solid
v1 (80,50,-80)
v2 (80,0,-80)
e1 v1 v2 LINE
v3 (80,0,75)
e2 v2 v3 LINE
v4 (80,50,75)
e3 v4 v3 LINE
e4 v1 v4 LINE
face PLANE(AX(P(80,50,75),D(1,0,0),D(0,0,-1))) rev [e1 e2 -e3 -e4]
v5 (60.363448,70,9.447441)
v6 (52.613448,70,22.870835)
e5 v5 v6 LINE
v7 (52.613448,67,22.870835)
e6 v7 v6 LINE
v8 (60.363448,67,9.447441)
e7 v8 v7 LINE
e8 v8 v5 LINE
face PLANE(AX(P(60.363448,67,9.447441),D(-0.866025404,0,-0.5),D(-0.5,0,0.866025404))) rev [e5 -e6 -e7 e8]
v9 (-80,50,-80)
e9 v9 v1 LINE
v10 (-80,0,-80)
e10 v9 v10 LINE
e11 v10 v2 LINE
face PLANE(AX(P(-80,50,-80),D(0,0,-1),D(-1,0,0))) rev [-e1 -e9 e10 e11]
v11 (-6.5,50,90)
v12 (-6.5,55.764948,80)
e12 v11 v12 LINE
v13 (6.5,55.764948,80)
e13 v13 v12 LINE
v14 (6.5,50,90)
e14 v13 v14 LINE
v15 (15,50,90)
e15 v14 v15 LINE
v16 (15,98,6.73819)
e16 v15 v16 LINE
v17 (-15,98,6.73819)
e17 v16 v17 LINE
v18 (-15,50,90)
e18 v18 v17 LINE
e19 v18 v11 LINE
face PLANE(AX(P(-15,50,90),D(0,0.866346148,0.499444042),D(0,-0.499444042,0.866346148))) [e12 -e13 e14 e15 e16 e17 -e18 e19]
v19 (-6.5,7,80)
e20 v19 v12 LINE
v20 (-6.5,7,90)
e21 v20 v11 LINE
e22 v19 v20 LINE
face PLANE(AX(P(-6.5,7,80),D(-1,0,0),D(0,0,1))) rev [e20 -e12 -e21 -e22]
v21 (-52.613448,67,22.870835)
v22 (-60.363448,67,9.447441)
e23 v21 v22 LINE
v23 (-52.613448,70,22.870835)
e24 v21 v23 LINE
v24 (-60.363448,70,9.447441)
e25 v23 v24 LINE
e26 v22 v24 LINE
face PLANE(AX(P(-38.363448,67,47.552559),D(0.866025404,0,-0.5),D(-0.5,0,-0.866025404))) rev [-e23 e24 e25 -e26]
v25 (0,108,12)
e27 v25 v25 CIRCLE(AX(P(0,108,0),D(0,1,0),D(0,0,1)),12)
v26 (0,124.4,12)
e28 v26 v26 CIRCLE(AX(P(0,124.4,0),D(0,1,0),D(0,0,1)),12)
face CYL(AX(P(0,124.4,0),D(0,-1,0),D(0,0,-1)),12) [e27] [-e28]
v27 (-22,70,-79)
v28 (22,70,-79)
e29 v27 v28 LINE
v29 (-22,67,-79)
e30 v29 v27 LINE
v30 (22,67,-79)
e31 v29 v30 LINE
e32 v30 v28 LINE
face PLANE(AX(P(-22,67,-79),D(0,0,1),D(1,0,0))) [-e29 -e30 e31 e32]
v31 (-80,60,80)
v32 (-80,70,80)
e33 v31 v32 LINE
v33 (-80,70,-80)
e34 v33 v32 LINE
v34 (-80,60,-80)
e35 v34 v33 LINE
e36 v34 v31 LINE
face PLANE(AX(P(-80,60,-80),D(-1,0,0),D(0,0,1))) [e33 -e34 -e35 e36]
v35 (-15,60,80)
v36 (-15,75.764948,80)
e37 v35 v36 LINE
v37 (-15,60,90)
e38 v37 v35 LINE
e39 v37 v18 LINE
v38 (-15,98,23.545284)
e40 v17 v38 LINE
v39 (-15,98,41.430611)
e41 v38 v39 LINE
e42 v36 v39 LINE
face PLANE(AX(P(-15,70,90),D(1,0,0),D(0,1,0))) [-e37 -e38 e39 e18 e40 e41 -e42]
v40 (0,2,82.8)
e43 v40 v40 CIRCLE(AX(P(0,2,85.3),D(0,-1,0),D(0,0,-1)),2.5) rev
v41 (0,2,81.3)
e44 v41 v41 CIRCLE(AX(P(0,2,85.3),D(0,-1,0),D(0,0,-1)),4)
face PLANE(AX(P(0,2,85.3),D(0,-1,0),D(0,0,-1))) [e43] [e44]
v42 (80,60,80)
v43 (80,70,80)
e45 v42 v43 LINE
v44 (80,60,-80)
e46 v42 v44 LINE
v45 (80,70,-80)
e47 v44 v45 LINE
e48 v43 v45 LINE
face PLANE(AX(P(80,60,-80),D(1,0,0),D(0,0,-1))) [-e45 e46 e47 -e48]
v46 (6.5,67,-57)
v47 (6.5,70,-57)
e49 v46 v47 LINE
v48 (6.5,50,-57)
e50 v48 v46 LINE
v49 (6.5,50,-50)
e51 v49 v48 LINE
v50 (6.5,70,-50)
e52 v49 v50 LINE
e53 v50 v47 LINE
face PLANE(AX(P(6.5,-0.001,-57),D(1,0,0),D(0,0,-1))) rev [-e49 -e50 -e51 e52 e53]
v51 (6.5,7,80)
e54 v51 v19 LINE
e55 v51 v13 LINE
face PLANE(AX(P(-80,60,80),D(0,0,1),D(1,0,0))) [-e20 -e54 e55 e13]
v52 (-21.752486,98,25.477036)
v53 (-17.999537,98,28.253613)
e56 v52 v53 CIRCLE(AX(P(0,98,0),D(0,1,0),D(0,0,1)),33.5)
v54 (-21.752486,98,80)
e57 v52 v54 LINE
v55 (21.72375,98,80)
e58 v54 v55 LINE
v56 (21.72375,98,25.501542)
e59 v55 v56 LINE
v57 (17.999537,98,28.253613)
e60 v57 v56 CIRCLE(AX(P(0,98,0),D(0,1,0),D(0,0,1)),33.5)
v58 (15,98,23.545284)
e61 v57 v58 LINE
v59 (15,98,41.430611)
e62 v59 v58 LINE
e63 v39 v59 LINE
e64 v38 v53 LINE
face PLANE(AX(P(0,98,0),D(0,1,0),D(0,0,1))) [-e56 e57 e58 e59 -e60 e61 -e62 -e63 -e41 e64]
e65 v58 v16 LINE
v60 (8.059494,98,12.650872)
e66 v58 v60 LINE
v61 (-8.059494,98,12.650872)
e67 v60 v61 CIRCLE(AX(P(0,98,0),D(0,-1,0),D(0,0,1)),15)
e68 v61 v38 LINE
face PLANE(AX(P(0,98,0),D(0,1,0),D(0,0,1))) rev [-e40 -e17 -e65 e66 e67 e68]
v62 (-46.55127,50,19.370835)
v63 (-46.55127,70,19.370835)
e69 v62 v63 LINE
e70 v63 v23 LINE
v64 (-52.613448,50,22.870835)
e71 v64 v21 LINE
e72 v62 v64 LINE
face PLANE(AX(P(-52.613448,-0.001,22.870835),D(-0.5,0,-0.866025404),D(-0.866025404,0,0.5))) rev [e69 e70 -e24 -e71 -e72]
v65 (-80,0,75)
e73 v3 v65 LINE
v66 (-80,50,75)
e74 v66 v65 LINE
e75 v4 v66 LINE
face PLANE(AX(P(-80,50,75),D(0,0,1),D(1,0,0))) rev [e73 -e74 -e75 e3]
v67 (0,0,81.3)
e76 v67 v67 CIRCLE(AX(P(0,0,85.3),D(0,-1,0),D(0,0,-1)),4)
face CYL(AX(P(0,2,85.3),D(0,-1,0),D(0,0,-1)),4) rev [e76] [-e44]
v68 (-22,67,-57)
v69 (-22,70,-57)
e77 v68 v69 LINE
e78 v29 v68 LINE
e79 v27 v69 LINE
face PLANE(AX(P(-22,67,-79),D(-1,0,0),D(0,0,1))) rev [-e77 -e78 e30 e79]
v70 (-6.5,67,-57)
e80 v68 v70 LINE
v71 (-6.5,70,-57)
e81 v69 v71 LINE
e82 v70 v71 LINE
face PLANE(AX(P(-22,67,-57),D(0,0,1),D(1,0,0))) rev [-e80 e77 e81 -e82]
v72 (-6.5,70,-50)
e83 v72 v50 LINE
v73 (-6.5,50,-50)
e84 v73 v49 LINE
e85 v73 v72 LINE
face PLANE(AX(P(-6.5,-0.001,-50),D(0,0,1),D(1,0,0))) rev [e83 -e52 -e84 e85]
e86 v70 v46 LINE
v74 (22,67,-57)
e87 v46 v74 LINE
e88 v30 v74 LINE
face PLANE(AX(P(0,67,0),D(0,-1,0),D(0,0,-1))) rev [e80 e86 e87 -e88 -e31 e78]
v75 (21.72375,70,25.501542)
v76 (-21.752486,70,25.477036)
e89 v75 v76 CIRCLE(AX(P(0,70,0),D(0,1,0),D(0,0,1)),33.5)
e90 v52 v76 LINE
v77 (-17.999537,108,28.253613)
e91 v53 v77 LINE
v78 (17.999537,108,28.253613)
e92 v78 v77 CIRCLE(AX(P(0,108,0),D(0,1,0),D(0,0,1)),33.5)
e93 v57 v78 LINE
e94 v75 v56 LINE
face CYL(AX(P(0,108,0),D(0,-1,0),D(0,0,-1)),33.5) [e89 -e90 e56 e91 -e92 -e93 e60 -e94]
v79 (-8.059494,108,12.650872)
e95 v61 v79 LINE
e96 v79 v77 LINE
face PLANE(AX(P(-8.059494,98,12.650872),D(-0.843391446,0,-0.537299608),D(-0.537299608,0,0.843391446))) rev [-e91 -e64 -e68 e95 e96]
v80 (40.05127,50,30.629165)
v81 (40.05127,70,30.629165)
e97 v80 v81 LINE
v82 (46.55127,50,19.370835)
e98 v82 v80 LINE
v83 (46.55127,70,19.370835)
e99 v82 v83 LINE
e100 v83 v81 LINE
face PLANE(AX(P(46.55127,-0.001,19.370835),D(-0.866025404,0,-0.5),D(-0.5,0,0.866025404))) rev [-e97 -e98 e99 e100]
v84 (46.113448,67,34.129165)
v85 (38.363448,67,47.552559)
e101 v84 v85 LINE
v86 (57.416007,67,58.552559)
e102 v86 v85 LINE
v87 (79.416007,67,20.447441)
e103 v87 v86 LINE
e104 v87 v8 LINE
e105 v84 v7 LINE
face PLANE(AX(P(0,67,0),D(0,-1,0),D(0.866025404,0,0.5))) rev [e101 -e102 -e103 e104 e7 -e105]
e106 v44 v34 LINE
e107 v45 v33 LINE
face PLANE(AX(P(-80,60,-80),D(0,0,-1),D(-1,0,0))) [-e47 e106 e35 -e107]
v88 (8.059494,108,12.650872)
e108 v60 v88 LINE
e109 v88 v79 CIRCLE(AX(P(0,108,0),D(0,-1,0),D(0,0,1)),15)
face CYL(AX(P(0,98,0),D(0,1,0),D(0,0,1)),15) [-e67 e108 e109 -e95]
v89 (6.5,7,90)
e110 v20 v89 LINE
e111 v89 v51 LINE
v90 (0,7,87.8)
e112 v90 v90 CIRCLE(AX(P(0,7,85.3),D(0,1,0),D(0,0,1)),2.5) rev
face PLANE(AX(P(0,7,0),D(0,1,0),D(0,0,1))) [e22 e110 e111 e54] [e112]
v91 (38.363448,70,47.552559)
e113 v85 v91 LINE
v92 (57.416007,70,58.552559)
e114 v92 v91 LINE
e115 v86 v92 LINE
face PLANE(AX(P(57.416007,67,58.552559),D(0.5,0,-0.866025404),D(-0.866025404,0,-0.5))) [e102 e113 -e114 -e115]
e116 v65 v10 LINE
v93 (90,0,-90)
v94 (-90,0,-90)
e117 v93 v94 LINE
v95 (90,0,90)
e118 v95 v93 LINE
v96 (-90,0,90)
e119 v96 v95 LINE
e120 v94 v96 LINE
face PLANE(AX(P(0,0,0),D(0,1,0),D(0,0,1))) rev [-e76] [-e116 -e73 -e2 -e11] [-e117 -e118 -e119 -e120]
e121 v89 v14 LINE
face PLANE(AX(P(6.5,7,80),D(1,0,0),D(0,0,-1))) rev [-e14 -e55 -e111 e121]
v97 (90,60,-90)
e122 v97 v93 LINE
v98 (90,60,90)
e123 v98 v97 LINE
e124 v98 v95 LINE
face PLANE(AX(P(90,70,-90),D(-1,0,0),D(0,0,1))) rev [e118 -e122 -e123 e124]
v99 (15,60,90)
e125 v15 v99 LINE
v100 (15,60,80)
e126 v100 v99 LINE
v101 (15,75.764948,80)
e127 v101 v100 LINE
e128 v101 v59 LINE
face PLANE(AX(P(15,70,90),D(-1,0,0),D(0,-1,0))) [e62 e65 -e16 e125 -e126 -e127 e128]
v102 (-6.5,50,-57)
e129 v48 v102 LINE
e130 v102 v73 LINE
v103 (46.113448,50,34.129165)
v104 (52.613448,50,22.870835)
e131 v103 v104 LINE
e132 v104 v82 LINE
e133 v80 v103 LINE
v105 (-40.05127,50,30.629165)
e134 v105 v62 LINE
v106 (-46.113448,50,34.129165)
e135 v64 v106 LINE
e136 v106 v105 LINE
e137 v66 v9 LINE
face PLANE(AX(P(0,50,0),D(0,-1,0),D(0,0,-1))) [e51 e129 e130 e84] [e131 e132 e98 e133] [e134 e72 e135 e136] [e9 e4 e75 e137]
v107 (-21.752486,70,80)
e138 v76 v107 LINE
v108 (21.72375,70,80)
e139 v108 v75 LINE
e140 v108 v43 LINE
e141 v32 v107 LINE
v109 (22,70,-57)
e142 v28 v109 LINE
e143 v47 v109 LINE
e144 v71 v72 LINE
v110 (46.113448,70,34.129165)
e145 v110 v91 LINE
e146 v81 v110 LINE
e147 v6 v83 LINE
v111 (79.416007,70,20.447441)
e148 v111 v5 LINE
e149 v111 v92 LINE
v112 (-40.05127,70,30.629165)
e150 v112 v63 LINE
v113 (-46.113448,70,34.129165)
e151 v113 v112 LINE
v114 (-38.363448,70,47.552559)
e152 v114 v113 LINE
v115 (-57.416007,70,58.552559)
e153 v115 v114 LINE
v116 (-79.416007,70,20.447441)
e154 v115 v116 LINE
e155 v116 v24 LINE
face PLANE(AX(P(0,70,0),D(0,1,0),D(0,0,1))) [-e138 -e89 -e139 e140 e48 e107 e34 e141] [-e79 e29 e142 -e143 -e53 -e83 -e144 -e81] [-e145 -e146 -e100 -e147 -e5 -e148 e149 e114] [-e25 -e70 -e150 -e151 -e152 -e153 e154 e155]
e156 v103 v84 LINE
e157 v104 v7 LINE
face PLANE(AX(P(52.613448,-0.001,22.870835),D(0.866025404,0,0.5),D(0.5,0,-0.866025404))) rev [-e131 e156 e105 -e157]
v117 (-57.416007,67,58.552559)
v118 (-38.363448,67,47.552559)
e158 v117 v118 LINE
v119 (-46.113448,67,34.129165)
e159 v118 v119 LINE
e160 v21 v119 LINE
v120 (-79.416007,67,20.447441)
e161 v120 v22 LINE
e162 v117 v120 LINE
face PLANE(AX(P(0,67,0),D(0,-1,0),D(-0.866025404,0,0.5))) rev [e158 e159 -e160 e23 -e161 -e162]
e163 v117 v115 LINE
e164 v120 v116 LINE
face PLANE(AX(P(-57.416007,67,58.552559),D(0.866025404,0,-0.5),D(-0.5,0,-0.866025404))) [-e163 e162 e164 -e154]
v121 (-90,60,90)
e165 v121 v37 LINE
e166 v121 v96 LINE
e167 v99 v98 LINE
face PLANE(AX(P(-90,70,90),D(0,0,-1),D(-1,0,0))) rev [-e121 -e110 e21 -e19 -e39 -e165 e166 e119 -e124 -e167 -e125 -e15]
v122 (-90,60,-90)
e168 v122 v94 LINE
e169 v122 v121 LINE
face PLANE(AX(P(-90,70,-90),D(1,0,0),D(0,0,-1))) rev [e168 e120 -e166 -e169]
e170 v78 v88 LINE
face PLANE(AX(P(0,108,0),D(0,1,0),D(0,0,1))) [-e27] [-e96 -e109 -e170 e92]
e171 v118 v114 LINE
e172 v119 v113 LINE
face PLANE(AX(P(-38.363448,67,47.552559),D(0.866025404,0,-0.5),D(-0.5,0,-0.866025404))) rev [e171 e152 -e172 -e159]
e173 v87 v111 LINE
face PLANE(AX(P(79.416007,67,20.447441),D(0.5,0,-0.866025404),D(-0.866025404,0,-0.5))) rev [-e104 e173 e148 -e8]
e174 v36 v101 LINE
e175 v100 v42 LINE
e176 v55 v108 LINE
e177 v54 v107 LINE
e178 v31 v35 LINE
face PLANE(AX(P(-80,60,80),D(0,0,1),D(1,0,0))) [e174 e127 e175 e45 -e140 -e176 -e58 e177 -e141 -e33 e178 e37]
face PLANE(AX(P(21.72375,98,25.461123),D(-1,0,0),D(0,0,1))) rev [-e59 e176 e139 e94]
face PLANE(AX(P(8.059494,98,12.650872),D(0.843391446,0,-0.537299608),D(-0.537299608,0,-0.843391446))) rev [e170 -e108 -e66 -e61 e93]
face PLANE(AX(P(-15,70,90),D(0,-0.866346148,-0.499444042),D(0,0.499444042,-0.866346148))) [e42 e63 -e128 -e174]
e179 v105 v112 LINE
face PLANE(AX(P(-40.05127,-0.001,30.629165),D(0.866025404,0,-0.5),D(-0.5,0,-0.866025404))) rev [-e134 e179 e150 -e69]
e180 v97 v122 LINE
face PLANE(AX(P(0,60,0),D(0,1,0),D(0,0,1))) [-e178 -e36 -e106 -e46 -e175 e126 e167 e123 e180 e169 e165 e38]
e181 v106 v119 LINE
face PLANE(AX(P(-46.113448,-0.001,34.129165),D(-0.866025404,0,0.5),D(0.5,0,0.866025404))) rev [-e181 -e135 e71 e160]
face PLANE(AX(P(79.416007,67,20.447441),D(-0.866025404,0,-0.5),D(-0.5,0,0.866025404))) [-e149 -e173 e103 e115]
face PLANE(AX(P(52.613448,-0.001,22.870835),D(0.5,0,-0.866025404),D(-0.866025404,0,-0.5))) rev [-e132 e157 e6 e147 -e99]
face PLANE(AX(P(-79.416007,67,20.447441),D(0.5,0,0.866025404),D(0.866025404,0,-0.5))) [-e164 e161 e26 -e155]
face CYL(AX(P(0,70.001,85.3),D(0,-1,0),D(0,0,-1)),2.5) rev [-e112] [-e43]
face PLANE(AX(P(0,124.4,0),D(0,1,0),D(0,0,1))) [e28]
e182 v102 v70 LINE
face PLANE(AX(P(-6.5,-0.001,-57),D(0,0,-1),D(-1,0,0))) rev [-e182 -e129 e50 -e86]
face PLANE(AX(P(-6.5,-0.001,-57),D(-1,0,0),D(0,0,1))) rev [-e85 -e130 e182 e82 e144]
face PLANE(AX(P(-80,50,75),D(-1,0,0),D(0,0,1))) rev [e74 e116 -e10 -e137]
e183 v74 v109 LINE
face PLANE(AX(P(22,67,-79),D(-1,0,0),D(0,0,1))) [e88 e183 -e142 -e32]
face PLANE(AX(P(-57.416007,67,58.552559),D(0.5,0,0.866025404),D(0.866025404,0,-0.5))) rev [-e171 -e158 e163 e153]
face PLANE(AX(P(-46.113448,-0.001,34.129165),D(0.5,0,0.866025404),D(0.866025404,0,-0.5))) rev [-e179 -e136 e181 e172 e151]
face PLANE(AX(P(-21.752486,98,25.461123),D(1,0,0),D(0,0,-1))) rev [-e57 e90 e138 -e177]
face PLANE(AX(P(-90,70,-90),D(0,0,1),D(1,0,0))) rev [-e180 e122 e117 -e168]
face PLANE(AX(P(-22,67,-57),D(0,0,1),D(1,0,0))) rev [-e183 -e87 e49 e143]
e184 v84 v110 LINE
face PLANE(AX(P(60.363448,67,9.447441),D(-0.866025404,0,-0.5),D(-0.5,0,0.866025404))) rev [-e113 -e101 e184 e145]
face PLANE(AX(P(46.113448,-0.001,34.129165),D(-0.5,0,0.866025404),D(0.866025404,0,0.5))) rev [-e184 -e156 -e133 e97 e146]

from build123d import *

# Parameters (mm, degrees)
SKETCH_3_W               = 180
SKETCH_3_H               = 180
EXTRUDE_1_DEPTH          = 70
SKETCH_5_OUTSIDE_W       = 234.802
SKETCH_5_OUTSIDE_H       = 234.802
SKETCH_5_OUTSIDE_W_2     = 160
SKETCH_5_OUTSIDE_H_2     = 160
CUT_EXTRUDE_1_DEPTH      = 10
SKETCH_6_W               = 13
SKETCH_6_H               = 10
CUT_EXTRUDE_2_DEPTH      = 53
CUT_EXTRUDE_3_REACH      = 147.258
SKETCH_7_R               = 2.5
SKETCH_8_R               = 4
CUT_EXTRUDE_4_DEPTH      = 2
SKETCH_9_R               = 33.5
EXTRUDE_2_DEPTH          = 38
SKETCH_10_R              = 12
EXTRUDE_3_DEPTH          = 16.4
SKETCH_11_W              = 44
SKETCH_11_H              = 22
CUT_EXTRUDE_5_DEPTH      = 3
PATTERN_CIRCULAR_1_COUNT = 3
CUT_EXTRUDE_6_REACH      = 147.258
SKETCH_12_W              = 13
SKETCH_12_H              = 7
PATTERN_CIRCULAR_2_COUNT = 3
SKETCH_13_W              = 160
SKETCH_13_H              = 155
CUT_EXTRUDE_7_DEPTH      = 50
CUT_EXTRUDE_START        = -10
CUT_EXTRUDE_8_DEPTH      = 10
SKETCH_20_W              = 43.47623614
SKETCH_20_H              = 54.53887657
EXTRUDE_4_DEPTH          = 28
SWEEP_START              = -15
SWEEP_2_DEPTH            = 30


# Read off the part's stored shape, not the designer's step: 切除-扫描2
with BuildPart() as part:
    # 草图3 → 凸台-拉伸1 (new body)
    with BuildSketch(Plane(origin=(0, 0, 0), x_dir=(1, 0, 0), z_dir=(0, 1, 0))):
        Rectangle(SKETCH_3_W, SKETCH_3_H)
    extrude(amount=EXTRUDE_1_DEPTH)

    # 草图5 outside → 切除-拉伸1 (cut)
    with BuildSketch(Plane(origin=(0, 70, 0), x_dir=(1, 0, 0), z_dir=(0, 1, 0))):
        Rectangle(SKETCH_5_OUTSIDE_W, SKETCH_5_OUTSIDE_H)
        Rectangle(SKETCH_5_OUTSIDE_W_2, SKETCH_5_OUTSIDE_H_2, mode=Mode.SUBTRACT)
    extrude(amount=-CUT_EXTRUDE_1_DEPTH, mode=Mode.SUBTRACT)

    # 草图6 → 切除-拉伸2 (cut)
    with BuildSketch(Plane(origin=(0, 60, 0), x_dir=(1, 0, 0), z_dir=(0, 1, 0))):
        with Locations((0, -85)):
            Rectangle(SKETCH_6_W, SKETCH_6_H)
    extrude(amount=-CUT_EXTRUDE_2_DEPTH, mode=Mode.SUBTRACT)

    # 草图7 → 切除-拉伸3 (cut, up to next)
    with BuildSketch(Plane.XZ, mode=Mode.PRIVATE) as cut_extrude_3_sk1:
        with Locations(Location((0, 85.3, 0), (0, 0, 270))):
            Circle(SKETCH_7_R)
    cut_extrude_3_tool1 = extrude(cut_extrude_3_sk1.sketch, amount=-CUT_EXTRUDE_3_REACH, mode=Mode.PRIVATE) & part.part
    add(cut_extrude_3_tool1.solids().sort_by_distance((0, 0, 85.3))[0], mode=Mode.SUBTRACT)

    # 草图8 → 切除-拉伸4 (cut)
    with BuildSketch(Plane.XZ):
        with Locations(Location((0, 85.3, 0), (0, 0, 270))):
            Circle(SKETCH_8_R)
    extrude(amount=-CUT_EXTRUDE_4_DEPTH, mode=Mode.SUBTRACT)

    # 草图9 → 凸台-拉伸2 (add)
    with BuildSketch(Plane(origin=(0, 70, 0), x_dir=(1, 0, 0), z_dir=(0, 1, 0))):
        with Locations(Location((0, 0, 0), (0, 0, 270))):
            Circle(SKETCH_9_R)
    extrude(amount=EXTRUDE_2_DEPTH)

    # 草图10 → 凸台-拉伸3 (add)
    with BuildSketch(Plane(origin=(0, 108, 0), x_dir=(1, 0, 0), z_dir=(0, 1, 0))):
        with Locations(Location((0, 0, 0), (0, 0, 270))):
            Circle(SKETCH_10_R)
    extrude(amount=EXTRUDE_3_DEPTH)

    # 草图11 → 切除-拉伸5 (cut)
    with BuildSketch(Plane(origin=(0, 70, 0), x_dir=(1, 0, 0), z_dir=(0, 1, 0))):
        with Locations((0, 68)):
            Rectangle(SKETCH_11_W, SKETCH_11_H)
    cut_extrude_5 = extrude(amount=-CUT_EXTRUDE_5_DEPTH, mode=Mode.SUBTRACT)

    # 阵列(圆周)1: 切除-拉伸5 ×3 about axis
    pattern_circular_1_axis = Axis((0, 0, 0), (0, 1, 0))
    for i in range(1, PATTERN_CIRCULAR_1_COUNT):
        add(cut_extrude_5.rotate(pattern_circular_1_axis, i * 360 / PATTERN_CIRCULAR_1_COUNT), mode=Mode.SUBTRACT)

    # 草图12 → 切除-拉伸6 (cut, up to next)
    with BuildSketch(Plane(origin=(0, 70, 0), x_dir=(1, 0, 0), z_dir=(0, 1, 0)), mode=Mode.PRIVATE) as cut_extrude_6_sk1:
        with Locations((0, 53.5)):
            Rectangle(SKETCH_12_W, SKETCH_12_H)
    cut_extrude_6_tool1 = extrude(cut_extrude_6_sk1.sketch, amount=-CUT_EXTRUDE_6_REACH, mode=Mode.PRIVATE) & part.part
    cut_extrude_6 = cut_extrude_6_tool1.solids().sort_by_distance((0, 70, -53.5))[0]
    add(cut_extrude_6, mode=Mode.SUBTRACT)

    # 阵列(圆周)2: 切除-拉伸6 ×3 about axis
    pattern_circular_2_axis = Axis((0, 0, 0), (0, 1, 0))
    for i in range(1, PATTERN_CIRCULAR_2_COUNT):
        add(cut_extrude_6.rotate(pattern_circular_2_axis, i * 360 / PATTERN_CIRCULAR_2_COUNT), mode=Mode.SUBTRACT)

    # 草图13 → 切除-拉伸7 (cut)
    with BuildSketch(Plane.XZ):
        with Locations((0, -2.5)):
            Rectangle(SKETCH_13_W, SKETCH_13_H)
    extrude(amount=-CUT_EXTRUDE_7_DEPTH, mode=Mode.SUBTRACT)

    # 草图14 → 切除-拉伸8 (cut)
    with BuildSketch(Plane(origin=(0, 108, 0), x_dir=(1, 0, 0), z_dir=(0, 1, 0)).offset(CUT_EXTRUDE_START)):
        with BuildLine():
            Line((-8.059494125, -12.650871687), (-17.99953688, -28.253613435))
            ThreePointArc((-17.99953688, -28.253613435), (0, -33.5), (17.99953688, -28.253613435))
            Line((17.99953688, -28.253613435), (8.059494125, -12.650871687))
            ThreePointArc((8.059494125, -12.650871687), (0, -15), (-8.059494125, -12.650871687))
        make_face()
    extrude(amount=CUT_EXTRUDE_8_DEPTH, mode=Mode.SUBTRACT)

    # 草图20 → 凸台-拉伸4 (add)
    with BuildSketch(Plane(origin=(0, 70, 0), x_dir=(1, 0, 0), z_dir=(0, 1, 0))):
        with Locations((-0.01436765, -52.730561715)):
            Rectangle(SKETCH_20_W, SKETCH_20_H)
    extrude(amount=EXTRUDE_4_DEPTH)

    # 切除-扫描2 outline → 切除-扫描2 (cut)
    with BuildSketch(Plane.YZ.offset(SWEEP_START)):
        Polygon((98, 6.738189634), (98, 41.43061062), (75.764947914, 80), (60, 80), (60, 90), (50, 90), align=None)
    extrude(amount=SWEEP_2_DEPTH, mode=Mode.SUBTRACT)


solid = part.part
